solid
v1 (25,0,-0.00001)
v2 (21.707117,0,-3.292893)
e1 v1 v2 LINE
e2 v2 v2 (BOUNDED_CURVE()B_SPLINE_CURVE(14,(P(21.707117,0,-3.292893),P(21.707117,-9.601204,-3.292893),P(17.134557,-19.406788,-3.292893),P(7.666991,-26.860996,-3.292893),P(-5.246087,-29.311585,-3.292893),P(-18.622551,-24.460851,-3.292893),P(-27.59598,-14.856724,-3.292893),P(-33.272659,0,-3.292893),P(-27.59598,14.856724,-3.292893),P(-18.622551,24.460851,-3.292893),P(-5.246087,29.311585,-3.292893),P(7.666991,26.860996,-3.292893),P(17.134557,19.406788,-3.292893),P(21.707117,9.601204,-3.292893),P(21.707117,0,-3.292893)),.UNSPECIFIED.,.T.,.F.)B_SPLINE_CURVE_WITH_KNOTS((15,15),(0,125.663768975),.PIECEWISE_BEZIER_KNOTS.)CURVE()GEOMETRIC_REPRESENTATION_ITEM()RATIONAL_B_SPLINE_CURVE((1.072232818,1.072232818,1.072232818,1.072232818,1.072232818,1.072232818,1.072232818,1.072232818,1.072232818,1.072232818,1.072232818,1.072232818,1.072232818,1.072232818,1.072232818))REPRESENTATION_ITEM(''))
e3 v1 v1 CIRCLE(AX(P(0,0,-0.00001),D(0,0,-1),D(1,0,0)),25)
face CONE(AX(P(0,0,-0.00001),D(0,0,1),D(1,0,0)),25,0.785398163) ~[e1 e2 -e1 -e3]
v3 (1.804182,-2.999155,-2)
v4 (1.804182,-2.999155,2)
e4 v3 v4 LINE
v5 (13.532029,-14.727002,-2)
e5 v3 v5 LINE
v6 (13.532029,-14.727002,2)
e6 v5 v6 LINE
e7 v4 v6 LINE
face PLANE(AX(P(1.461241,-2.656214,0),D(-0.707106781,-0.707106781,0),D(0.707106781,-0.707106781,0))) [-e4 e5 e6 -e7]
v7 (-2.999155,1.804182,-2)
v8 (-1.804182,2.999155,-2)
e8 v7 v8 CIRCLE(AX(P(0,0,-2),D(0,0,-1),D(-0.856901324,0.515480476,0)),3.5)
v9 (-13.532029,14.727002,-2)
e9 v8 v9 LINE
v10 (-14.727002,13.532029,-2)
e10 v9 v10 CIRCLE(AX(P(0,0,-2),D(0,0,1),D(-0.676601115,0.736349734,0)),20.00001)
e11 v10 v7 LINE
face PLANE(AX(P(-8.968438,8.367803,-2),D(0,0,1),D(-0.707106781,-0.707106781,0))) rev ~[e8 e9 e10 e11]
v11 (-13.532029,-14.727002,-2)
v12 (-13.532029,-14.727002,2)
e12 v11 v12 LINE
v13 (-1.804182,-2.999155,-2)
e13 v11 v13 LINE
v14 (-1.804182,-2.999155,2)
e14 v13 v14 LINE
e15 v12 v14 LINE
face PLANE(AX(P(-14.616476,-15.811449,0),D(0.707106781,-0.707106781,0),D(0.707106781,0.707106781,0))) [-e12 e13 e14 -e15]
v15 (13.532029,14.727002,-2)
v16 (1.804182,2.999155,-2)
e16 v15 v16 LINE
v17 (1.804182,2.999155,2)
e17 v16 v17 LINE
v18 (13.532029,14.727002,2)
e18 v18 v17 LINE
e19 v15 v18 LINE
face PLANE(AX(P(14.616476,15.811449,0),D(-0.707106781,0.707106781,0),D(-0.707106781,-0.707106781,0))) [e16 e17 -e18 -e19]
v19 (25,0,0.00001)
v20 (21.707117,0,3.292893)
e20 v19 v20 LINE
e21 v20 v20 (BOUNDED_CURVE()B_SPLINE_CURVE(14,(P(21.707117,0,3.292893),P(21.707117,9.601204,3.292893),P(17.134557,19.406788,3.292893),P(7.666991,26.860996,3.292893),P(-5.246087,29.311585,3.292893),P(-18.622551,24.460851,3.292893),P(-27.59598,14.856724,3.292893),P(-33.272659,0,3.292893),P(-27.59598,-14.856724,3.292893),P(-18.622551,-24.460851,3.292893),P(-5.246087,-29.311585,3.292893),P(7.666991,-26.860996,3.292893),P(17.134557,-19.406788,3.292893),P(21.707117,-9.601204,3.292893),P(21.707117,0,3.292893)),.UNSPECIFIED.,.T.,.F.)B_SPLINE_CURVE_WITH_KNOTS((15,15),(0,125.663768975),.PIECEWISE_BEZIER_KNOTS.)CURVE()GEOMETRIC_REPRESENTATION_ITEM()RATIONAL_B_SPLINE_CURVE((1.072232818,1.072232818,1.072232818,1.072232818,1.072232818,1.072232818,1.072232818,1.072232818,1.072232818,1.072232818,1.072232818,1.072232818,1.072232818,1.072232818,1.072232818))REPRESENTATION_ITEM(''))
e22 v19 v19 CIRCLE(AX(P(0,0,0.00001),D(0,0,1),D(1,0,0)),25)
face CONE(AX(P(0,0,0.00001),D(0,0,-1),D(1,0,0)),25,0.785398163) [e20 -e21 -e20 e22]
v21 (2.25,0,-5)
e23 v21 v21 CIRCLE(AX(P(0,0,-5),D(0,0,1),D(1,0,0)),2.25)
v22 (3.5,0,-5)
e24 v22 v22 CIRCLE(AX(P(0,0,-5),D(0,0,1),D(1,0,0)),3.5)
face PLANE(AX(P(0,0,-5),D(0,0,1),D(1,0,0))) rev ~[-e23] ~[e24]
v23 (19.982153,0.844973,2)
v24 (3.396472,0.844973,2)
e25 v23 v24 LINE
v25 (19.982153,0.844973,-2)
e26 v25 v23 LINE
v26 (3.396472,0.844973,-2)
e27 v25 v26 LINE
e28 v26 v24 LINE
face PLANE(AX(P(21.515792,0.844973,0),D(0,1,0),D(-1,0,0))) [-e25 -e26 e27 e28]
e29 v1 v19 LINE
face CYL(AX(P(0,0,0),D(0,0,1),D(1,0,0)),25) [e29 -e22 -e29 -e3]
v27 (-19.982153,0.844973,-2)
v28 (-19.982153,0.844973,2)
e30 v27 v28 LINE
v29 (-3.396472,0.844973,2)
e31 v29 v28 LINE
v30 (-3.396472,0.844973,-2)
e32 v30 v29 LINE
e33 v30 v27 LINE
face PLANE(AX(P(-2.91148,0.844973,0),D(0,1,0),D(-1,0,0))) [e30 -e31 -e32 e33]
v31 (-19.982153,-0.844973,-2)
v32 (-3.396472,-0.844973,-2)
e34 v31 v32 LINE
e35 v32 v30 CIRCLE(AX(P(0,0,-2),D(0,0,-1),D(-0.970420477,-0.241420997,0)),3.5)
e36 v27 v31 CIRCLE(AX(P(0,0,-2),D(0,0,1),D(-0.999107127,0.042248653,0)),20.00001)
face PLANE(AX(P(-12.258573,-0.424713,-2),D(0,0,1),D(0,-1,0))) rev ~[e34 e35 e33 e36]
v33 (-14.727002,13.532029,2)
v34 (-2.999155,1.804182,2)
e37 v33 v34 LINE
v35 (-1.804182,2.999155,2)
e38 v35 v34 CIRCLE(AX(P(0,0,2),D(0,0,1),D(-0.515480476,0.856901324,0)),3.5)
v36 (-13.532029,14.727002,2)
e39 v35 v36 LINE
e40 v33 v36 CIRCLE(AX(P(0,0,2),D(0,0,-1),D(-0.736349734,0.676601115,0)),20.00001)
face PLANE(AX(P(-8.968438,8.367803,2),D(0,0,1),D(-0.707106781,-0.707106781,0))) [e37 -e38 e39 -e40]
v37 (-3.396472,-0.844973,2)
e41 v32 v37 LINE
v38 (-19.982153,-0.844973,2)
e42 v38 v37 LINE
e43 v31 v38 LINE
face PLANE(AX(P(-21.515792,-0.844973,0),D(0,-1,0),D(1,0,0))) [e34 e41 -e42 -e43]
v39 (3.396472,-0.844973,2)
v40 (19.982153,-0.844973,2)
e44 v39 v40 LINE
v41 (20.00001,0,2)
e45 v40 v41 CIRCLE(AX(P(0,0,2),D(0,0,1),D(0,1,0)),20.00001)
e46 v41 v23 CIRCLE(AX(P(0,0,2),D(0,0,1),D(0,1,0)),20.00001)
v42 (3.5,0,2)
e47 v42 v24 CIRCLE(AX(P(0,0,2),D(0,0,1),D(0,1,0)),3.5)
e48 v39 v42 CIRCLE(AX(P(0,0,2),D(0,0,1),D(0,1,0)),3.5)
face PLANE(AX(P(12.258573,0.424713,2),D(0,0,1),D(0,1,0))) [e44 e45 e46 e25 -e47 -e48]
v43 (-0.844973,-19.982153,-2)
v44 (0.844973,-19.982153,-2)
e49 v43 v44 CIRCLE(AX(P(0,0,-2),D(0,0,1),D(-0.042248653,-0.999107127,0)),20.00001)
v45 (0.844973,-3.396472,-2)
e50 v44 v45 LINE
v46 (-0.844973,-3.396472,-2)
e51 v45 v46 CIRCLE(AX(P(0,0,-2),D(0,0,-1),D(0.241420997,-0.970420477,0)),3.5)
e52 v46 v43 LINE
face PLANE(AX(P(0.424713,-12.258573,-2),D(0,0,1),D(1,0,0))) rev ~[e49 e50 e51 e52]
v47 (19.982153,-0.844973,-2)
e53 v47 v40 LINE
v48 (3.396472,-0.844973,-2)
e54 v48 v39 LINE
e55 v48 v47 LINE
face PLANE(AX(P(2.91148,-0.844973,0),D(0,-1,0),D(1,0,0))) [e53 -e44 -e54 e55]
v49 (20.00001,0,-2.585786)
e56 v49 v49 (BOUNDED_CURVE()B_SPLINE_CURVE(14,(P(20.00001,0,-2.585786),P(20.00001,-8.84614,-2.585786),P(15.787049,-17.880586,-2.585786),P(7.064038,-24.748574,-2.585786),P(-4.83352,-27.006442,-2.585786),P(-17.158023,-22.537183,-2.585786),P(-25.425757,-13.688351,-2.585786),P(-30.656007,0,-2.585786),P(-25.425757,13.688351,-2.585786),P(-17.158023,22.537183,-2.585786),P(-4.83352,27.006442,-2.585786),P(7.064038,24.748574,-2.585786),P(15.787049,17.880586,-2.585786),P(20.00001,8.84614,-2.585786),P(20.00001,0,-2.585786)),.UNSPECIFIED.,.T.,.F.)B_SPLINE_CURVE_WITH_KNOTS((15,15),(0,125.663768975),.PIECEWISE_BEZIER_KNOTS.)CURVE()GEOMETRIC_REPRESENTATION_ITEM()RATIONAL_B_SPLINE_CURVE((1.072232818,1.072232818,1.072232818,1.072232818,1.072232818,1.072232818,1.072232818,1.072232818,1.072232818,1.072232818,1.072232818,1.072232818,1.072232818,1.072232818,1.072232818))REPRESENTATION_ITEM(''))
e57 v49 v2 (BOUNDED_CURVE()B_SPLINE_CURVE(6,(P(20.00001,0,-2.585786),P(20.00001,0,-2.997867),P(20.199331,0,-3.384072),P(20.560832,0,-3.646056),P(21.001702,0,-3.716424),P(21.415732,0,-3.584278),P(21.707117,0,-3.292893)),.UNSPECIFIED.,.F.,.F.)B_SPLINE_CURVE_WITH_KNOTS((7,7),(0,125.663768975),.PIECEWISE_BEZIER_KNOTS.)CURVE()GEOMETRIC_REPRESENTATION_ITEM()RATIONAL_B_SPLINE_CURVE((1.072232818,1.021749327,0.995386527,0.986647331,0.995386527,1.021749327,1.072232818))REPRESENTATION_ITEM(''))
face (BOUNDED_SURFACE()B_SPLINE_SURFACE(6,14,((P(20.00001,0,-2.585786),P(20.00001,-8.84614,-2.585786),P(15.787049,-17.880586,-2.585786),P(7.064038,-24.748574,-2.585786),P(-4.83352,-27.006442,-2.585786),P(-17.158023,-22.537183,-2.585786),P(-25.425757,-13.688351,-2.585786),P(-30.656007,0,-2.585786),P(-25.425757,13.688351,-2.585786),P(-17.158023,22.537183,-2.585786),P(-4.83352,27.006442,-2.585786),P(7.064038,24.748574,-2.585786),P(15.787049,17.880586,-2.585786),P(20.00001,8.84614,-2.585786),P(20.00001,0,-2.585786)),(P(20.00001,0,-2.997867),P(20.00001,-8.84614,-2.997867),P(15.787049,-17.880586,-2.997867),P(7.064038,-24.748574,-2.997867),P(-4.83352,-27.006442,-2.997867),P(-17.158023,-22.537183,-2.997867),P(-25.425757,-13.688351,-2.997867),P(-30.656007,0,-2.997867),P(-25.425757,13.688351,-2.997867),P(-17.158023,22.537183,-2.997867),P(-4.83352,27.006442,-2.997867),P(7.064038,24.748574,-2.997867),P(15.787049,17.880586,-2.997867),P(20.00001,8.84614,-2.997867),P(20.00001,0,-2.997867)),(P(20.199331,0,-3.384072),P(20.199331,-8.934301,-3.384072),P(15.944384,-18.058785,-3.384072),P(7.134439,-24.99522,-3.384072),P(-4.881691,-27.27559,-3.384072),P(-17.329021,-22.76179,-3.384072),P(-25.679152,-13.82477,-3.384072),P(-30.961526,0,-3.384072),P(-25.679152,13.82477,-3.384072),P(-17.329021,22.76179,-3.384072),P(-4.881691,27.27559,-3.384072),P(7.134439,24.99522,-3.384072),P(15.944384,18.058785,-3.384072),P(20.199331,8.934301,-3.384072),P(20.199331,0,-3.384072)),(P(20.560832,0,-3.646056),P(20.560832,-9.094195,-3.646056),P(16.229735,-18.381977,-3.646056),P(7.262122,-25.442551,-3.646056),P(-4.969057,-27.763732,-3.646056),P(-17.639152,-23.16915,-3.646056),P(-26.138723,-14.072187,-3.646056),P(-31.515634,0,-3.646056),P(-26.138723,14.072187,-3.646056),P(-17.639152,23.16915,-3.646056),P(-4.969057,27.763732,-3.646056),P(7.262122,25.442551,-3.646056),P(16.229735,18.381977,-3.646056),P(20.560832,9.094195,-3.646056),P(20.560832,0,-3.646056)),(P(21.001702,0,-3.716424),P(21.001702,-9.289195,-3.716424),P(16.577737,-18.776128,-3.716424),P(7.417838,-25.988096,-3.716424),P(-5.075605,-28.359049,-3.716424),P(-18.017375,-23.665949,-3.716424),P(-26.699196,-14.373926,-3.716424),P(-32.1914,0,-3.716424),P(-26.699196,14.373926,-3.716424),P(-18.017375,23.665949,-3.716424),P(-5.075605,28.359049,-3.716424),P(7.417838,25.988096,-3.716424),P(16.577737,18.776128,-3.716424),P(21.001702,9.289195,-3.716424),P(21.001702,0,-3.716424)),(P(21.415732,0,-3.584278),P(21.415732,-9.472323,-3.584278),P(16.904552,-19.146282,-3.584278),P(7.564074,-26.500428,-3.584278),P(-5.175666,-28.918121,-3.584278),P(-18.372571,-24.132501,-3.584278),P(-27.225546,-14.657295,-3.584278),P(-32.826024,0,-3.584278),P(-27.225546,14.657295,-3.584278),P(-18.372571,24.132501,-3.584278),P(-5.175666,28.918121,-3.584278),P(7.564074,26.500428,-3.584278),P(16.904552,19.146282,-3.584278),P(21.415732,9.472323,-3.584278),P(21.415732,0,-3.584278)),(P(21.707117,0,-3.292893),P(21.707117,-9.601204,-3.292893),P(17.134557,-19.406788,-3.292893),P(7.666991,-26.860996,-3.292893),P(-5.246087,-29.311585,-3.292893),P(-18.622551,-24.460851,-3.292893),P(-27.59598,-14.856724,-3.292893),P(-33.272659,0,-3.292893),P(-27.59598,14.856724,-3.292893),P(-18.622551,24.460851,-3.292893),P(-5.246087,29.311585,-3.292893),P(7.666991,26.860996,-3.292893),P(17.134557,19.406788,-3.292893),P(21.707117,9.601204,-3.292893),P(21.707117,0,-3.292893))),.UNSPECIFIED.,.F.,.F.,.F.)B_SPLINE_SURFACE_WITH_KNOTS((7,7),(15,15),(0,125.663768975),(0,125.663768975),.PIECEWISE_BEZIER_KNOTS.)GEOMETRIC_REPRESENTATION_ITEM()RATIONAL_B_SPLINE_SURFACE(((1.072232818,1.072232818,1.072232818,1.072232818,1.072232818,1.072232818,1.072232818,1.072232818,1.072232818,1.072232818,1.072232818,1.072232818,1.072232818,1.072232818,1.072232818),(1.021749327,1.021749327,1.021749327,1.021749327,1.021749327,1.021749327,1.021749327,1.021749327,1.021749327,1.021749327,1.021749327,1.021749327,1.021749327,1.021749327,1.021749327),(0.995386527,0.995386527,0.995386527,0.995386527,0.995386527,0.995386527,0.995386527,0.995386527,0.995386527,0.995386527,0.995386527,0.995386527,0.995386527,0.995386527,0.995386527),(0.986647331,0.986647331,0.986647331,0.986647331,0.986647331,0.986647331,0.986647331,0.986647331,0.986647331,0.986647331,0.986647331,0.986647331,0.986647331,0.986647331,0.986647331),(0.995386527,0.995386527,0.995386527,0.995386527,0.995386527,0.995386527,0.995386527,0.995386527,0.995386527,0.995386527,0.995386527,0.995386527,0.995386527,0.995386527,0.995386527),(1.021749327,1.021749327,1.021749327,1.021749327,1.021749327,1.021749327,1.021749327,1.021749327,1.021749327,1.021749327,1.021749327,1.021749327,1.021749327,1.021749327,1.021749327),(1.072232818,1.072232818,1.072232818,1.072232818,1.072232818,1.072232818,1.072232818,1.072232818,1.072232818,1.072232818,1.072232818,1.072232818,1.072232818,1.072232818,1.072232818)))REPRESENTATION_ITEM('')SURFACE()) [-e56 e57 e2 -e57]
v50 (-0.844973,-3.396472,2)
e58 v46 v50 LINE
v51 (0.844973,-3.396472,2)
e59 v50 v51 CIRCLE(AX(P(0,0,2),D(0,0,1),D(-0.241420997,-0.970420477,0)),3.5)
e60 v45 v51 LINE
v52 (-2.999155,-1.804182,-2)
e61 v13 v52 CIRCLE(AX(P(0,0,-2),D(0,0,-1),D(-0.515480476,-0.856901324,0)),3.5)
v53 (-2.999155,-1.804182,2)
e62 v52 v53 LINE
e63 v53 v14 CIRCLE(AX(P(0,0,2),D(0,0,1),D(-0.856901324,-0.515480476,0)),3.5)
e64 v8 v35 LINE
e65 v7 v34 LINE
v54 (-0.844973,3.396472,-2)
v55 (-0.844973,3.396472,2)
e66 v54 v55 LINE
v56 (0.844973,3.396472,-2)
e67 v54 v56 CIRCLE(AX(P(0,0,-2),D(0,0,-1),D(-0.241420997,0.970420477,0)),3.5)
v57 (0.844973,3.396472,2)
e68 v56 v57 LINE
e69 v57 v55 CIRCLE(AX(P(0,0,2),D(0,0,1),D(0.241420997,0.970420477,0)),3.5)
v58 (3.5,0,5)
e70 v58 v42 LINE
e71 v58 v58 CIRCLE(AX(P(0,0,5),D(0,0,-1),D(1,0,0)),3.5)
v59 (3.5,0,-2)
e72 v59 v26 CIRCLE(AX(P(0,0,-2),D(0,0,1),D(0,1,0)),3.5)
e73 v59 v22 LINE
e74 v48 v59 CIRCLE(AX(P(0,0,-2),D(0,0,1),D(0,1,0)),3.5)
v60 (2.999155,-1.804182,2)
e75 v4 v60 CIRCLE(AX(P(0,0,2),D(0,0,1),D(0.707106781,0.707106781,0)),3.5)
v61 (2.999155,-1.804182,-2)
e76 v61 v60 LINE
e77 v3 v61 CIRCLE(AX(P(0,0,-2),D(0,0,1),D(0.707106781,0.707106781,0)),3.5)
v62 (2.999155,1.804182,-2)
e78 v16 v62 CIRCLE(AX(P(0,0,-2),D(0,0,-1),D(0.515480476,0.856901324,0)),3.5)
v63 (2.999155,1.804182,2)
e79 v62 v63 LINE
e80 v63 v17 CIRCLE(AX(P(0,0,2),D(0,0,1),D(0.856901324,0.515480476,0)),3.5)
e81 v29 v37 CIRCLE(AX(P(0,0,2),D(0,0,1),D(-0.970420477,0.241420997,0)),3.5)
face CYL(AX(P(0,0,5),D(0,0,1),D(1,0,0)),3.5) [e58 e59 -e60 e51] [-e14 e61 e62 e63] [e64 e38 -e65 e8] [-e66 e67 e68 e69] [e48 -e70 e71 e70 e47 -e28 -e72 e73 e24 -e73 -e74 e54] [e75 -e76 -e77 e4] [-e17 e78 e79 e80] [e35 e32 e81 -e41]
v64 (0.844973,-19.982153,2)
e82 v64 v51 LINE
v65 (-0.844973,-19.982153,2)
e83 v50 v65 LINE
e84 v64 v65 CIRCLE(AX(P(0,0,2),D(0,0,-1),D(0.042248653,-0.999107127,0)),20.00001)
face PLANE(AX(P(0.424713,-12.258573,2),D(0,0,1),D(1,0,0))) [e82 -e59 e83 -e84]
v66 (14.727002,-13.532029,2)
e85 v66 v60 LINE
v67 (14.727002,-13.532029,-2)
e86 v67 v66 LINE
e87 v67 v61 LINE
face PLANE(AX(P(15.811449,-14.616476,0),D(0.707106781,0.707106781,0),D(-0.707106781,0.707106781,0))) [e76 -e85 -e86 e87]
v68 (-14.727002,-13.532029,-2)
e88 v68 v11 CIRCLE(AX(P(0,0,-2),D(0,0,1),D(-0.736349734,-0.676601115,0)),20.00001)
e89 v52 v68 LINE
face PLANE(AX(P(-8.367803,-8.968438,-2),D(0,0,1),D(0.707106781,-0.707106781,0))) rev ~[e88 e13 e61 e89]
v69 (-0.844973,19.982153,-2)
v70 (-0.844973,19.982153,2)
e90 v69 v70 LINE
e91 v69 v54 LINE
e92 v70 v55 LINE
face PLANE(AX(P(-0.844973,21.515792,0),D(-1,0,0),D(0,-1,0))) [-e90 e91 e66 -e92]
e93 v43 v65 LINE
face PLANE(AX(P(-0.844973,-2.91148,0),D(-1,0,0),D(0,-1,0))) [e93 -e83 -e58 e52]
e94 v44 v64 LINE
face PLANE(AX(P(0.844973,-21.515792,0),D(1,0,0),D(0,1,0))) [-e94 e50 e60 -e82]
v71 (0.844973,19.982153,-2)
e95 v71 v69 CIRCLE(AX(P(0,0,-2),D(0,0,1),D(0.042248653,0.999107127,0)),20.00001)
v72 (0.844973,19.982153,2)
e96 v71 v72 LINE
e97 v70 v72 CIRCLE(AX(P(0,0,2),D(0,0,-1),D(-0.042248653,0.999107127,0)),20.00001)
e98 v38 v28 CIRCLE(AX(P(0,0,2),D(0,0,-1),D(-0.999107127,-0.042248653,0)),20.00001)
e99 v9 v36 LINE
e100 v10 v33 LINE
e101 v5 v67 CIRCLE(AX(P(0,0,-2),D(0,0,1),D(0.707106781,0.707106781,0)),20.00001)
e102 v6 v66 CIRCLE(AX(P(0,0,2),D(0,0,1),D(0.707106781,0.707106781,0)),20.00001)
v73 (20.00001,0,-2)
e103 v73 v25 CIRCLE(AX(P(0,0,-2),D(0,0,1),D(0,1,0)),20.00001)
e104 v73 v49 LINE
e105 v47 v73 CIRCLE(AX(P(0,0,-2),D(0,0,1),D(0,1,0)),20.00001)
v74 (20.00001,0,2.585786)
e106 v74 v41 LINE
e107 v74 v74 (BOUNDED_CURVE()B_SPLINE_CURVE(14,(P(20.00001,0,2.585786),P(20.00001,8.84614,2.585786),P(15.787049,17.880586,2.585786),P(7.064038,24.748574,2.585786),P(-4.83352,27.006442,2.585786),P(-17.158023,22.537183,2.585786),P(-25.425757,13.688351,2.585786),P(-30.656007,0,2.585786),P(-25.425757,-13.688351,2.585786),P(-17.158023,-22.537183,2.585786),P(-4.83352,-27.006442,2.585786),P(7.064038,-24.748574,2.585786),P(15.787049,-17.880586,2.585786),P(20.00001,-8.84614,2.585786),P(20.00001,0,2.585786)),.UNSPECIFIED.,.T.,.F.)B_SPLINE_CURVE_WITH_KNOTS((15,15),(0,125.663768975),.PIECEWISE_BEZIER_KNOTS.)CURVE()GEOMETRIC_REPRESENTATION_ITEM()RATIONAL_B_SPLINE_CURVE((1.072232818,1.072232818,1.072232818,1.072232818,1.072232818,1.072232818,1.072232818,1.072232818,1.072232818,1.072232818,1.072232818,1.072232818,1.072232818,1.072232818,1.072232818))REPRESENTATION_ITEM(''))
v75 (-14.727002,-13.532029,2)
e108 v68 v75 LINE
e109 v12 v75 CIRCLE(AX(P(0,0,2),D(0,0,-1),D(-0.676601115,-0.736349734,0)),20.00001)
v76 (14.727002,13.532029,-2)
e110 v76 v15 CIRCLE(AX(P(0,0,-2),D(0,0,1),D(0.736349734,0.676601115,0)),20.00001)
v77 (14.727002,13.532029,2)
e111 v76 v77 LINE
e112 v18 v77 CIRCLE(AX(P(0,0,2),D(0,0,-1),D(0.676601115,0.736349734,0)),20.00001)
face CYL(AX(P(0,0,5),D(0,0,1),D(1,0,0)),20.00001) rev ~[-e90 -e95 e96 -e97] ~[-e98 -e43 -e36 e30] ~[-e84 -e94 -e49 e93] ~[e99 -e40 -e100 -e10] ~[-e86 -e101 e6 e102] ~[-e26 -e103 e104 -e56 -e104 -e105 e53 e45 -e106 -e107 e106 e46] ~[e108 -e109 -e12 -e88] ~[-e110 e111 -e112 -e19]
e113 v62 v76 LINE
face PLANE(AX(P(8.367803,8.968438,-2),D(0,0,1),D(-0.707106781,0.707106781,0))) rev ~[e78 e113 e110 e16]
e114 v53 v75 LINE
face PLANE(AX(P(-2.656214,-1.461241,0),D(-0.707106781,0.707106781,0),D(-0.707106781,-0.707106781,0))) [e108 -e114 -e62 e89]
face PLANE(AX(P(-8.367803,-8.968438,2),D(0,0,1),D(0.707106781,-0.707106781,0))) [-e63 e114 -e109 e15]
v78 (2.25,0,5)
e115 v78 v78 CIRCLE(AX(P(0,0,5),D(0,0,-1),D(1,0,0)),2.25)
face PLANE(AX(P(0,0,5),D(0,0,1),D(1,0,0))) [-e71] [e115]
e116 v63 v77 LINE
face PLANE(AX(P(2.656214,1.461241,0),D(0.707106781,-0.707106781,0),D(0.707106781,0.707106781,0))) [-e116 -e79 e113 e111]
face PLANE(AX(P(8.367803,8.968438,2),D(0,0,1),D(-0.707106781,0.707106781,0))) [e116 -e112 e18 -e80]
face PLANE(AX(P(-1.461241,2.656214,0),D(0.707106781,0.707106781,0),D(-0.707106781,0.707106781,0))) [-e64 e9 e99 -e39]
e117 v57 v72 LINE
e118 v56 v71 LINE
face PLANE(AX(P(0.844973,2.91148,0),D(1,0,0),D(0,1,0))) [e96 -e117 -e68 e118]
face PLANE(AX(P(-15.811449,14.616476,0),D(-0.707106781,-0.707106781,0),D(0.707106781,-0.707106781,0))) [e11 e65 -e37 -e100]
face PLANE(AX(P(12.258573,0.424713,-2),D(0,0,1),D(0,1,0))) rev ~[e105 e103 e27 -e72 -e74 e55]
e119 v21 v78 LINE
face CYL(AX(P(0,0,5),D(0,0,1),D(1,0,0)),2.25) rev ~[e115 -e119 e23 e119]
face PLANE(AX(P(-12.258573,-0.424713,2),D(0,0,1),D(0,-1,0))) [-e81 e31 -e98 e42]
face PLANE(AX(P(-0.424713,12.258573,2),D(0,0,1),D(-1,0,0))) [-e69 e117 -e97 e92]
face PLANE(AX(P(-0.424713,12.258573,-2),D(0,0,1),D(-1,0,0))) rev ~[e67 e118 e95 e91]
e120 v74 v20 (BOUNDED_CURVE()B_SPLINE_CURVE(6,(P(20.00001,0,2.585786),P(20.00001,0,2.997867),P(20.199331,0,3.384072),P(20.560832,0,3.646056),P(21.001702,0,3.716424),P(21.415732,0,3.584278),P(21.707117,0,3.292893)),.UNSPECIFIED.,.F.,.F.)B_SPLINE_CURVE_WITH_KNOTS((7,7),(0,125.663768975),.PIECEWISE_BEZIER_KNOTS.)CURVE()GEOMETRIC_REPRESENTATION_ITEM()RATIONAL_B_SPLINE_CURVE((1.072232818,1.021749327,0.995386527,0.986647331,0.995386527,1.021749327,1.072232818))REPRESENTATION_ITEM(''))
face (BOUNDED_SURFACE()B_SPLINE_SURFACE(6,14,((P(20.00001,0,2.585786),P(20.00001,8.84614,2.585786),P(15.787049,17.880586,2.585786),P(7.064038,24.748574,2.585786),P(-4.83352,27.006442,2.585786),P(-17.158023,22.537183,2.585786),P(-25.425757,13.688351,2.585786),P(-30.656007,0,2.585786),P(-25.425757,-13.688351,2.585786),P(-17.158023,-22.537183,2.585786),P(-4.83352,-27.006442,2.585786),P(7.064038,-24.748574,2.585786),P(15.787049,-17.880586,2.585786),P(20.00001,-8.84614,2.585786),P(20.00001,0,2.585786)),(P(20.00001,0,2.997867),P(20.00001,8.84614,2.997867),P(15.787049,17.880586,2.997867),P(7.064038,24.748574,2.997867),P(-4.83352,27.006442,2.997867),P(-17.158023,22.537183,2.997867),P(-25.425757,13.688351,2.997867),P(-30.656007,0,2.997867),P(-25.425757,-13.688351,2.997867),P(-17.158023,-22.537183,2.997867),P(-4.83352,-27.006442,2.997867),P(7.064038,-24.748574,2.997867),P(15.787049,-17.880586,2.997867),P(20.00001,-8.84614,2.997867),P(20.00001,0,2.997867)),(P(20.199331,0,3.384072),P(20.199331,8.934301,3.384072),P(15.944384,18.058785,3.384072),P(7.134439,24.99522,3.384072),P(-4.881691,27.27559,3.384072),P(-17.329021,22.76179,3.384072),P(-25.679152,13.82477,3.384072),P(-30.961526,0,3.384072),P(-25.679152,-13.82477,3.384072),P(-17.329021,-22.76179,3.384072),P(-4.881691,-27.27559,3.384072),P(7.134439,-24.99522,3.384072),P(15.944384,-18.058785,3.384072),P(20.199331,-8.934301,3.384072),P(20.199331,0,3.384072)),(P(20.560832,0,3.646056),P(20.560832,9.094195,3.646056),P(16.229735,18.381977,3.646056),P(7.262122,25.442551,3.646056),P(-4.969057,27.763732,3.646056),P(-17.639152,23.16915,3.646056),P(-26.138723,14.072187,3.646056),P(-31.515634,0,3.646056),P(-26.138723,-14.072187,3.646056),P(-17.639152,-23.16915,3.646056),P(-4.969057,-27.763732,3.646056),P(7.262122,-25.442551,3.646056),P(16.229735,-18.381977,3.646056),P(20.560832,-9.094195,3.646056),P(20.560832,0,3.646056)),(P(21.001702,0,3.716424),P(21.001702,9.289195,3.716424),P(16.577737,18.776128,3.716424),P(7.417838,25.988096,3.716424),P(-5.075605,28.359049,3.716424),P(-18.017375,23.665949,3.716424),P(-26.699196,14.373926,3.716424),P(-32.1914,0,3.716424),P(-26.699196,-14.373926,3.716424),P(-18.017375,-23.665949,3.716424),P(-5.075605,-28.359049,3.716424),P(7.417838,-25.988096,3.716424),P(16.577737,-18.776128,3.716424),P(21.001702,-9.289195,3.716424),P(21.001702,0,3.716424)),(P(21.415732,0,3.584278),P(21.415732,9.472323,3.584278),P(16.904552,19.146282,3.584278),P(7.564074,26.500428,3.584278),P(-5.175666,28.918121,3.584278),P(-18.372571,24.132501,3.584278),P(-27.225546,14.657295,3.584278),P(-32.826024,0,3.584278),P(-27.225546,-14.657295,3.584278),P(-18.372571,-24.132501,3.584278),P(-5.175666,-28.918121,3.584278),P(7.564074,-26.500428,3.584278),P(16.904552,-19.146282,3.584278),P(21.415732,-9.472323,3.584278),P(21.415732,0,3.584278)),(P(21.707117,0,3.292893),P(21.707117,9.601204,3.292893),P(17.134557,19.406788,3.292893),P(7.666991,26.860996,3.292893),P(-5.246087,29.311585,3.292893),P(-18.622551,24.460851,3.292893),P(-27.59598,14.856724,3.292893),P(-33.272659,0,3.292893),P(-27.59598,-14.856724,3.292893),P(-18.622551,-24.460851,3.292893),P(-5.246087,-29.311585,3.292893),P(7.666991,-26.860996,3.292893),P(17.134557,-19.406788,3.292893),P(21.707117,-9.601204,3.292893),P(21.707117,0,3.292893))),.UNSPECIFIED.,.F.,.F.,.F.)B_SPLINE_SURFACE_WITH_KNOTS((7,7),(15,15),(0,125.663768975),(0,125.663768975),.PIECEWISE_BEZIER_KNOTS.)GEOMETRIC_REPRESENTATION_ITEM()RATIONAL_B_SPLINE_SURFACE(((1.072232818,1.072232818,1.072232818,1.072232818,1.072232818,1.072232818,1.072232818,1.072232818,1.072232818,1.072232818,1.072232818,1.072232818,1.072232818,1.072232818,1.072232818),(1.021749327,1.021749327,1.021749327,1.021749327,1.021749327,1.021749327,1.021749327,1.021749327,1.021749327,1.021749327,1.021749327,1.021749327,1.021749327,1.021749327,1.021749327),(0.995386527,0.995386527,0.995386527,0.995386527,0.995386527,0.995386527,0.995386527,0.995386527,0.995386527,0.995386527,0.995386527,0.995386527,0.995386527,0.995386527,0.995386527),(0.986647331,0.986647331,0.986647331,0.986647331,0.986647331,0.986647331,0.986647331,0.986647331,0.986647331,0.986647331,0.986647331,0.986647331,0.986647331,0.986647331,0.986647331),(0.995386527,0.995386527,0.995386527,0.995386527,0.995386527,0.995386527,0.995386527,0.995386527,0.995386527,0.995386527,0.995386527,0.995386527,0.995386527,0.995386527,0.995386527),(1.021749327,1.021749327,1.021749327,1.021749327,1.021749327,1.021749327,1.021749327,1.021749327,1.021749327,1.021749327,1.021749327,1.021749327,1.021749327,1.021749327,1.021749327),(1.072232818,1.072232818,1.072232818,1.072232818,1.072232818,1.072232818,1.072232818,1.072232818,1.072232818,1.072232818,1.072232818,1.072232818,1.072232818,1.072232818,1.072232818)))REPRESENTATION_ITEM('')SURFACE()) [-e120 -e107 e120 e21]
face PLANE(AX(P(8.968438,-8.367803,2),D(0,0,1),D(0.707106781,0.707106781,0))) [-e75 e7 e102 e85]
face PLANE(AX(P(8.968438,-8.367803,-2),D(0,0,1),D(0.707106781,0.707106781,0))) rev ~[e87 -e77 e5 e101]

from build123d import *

# Parameters (mm, degrees)
F0_R     = 25
F1_DEPTH = 5
F2_SIZE  = 4.99999
F3_R     = 20.00001
F3_R_2   = 3.5
F4_DEPTH = 25
F3_R_3   = 2.25
F5_DEPTH = 12.5
F7_DEPTH = 2
F9_COUNT = 8
F10_R    = 1


# Not quite as in the source:
# - a fillet or chamfer is up to 0.001 mm smaller than in the source, because OpenCascade refuses the exact size


with BuildPart() as f1:
    # F0 (on Top) → F1 (new body, symmetric)
    with BuildSketch(Plane.XY):
        Circle(F0_R)
    extrude(amount=F1_DEPTH, both=True)

    # F2 (size 5 in the source; OpenCascade refuses exactly that, so slightly less here)
    f2_edges = [f1.edges().sort_by_distance(p)[0] for p in [
        (-25, 0, -5),
        (25, 0, 0),
        (-25, 0, 5),
    ]]
    chamfer(f2_edges, length=F2_SIZE)

    # F3 (on face) → F4 (cut)
    with BuildSketch(Plane.XY.offset(5)):
        Circle(F3_R)
        Circle(F3_R_2, mode=Mode.SUBTRACT)
    extrude(amount=-F4_DEPTH, mode=Mode.SUBTRACT)

    # F3 (on face) → F5 (cut, symmetric)
    with BuildSketch(Plane.XY.offset(5)):
        Circle(F3_R_3)
    extrude(amount=F5_DEPTH, both=True, mode=Mode.SUBTRACT)

    # F6 (on Top) → F7 (join, symmetric)
    with BuildSketch(Plane.XY):
        Polygon((0.8449734887, -2.9114803765), (0, -3.1155126635), (0, -21.5157922357), (0.8449734887, -21.5157922357), align=None)
        Polygon((0, -21.5157922357), (0, -3.1155126635), (-0.8449734887, -2.9114803765), (-0.8449734887, -21.5157922357), align=None)
    extrude(amount=F7_DEPTH, both=True)

    # F9: F1 ×8 about axis
    f9_axis = Axis((0, 0, 0.2882219851), (0, 0, -1))


with BuildPart() as f1_1:
    add(f1.part)
    for i in range(1, F9_COUNT):
        add(f1.part.rotate(f9_axis, i * 360 / F9_COUNT))

    # F10
    f10_edges = [f1_1.edges().sort_by_distance(p)[0] for p in [
        (-20.00001, 0, 5),
        (-20.00001, 0, -5),
    ]]
    fillet(f10_edges, radius=F10_R)


solid = f1_1.part
